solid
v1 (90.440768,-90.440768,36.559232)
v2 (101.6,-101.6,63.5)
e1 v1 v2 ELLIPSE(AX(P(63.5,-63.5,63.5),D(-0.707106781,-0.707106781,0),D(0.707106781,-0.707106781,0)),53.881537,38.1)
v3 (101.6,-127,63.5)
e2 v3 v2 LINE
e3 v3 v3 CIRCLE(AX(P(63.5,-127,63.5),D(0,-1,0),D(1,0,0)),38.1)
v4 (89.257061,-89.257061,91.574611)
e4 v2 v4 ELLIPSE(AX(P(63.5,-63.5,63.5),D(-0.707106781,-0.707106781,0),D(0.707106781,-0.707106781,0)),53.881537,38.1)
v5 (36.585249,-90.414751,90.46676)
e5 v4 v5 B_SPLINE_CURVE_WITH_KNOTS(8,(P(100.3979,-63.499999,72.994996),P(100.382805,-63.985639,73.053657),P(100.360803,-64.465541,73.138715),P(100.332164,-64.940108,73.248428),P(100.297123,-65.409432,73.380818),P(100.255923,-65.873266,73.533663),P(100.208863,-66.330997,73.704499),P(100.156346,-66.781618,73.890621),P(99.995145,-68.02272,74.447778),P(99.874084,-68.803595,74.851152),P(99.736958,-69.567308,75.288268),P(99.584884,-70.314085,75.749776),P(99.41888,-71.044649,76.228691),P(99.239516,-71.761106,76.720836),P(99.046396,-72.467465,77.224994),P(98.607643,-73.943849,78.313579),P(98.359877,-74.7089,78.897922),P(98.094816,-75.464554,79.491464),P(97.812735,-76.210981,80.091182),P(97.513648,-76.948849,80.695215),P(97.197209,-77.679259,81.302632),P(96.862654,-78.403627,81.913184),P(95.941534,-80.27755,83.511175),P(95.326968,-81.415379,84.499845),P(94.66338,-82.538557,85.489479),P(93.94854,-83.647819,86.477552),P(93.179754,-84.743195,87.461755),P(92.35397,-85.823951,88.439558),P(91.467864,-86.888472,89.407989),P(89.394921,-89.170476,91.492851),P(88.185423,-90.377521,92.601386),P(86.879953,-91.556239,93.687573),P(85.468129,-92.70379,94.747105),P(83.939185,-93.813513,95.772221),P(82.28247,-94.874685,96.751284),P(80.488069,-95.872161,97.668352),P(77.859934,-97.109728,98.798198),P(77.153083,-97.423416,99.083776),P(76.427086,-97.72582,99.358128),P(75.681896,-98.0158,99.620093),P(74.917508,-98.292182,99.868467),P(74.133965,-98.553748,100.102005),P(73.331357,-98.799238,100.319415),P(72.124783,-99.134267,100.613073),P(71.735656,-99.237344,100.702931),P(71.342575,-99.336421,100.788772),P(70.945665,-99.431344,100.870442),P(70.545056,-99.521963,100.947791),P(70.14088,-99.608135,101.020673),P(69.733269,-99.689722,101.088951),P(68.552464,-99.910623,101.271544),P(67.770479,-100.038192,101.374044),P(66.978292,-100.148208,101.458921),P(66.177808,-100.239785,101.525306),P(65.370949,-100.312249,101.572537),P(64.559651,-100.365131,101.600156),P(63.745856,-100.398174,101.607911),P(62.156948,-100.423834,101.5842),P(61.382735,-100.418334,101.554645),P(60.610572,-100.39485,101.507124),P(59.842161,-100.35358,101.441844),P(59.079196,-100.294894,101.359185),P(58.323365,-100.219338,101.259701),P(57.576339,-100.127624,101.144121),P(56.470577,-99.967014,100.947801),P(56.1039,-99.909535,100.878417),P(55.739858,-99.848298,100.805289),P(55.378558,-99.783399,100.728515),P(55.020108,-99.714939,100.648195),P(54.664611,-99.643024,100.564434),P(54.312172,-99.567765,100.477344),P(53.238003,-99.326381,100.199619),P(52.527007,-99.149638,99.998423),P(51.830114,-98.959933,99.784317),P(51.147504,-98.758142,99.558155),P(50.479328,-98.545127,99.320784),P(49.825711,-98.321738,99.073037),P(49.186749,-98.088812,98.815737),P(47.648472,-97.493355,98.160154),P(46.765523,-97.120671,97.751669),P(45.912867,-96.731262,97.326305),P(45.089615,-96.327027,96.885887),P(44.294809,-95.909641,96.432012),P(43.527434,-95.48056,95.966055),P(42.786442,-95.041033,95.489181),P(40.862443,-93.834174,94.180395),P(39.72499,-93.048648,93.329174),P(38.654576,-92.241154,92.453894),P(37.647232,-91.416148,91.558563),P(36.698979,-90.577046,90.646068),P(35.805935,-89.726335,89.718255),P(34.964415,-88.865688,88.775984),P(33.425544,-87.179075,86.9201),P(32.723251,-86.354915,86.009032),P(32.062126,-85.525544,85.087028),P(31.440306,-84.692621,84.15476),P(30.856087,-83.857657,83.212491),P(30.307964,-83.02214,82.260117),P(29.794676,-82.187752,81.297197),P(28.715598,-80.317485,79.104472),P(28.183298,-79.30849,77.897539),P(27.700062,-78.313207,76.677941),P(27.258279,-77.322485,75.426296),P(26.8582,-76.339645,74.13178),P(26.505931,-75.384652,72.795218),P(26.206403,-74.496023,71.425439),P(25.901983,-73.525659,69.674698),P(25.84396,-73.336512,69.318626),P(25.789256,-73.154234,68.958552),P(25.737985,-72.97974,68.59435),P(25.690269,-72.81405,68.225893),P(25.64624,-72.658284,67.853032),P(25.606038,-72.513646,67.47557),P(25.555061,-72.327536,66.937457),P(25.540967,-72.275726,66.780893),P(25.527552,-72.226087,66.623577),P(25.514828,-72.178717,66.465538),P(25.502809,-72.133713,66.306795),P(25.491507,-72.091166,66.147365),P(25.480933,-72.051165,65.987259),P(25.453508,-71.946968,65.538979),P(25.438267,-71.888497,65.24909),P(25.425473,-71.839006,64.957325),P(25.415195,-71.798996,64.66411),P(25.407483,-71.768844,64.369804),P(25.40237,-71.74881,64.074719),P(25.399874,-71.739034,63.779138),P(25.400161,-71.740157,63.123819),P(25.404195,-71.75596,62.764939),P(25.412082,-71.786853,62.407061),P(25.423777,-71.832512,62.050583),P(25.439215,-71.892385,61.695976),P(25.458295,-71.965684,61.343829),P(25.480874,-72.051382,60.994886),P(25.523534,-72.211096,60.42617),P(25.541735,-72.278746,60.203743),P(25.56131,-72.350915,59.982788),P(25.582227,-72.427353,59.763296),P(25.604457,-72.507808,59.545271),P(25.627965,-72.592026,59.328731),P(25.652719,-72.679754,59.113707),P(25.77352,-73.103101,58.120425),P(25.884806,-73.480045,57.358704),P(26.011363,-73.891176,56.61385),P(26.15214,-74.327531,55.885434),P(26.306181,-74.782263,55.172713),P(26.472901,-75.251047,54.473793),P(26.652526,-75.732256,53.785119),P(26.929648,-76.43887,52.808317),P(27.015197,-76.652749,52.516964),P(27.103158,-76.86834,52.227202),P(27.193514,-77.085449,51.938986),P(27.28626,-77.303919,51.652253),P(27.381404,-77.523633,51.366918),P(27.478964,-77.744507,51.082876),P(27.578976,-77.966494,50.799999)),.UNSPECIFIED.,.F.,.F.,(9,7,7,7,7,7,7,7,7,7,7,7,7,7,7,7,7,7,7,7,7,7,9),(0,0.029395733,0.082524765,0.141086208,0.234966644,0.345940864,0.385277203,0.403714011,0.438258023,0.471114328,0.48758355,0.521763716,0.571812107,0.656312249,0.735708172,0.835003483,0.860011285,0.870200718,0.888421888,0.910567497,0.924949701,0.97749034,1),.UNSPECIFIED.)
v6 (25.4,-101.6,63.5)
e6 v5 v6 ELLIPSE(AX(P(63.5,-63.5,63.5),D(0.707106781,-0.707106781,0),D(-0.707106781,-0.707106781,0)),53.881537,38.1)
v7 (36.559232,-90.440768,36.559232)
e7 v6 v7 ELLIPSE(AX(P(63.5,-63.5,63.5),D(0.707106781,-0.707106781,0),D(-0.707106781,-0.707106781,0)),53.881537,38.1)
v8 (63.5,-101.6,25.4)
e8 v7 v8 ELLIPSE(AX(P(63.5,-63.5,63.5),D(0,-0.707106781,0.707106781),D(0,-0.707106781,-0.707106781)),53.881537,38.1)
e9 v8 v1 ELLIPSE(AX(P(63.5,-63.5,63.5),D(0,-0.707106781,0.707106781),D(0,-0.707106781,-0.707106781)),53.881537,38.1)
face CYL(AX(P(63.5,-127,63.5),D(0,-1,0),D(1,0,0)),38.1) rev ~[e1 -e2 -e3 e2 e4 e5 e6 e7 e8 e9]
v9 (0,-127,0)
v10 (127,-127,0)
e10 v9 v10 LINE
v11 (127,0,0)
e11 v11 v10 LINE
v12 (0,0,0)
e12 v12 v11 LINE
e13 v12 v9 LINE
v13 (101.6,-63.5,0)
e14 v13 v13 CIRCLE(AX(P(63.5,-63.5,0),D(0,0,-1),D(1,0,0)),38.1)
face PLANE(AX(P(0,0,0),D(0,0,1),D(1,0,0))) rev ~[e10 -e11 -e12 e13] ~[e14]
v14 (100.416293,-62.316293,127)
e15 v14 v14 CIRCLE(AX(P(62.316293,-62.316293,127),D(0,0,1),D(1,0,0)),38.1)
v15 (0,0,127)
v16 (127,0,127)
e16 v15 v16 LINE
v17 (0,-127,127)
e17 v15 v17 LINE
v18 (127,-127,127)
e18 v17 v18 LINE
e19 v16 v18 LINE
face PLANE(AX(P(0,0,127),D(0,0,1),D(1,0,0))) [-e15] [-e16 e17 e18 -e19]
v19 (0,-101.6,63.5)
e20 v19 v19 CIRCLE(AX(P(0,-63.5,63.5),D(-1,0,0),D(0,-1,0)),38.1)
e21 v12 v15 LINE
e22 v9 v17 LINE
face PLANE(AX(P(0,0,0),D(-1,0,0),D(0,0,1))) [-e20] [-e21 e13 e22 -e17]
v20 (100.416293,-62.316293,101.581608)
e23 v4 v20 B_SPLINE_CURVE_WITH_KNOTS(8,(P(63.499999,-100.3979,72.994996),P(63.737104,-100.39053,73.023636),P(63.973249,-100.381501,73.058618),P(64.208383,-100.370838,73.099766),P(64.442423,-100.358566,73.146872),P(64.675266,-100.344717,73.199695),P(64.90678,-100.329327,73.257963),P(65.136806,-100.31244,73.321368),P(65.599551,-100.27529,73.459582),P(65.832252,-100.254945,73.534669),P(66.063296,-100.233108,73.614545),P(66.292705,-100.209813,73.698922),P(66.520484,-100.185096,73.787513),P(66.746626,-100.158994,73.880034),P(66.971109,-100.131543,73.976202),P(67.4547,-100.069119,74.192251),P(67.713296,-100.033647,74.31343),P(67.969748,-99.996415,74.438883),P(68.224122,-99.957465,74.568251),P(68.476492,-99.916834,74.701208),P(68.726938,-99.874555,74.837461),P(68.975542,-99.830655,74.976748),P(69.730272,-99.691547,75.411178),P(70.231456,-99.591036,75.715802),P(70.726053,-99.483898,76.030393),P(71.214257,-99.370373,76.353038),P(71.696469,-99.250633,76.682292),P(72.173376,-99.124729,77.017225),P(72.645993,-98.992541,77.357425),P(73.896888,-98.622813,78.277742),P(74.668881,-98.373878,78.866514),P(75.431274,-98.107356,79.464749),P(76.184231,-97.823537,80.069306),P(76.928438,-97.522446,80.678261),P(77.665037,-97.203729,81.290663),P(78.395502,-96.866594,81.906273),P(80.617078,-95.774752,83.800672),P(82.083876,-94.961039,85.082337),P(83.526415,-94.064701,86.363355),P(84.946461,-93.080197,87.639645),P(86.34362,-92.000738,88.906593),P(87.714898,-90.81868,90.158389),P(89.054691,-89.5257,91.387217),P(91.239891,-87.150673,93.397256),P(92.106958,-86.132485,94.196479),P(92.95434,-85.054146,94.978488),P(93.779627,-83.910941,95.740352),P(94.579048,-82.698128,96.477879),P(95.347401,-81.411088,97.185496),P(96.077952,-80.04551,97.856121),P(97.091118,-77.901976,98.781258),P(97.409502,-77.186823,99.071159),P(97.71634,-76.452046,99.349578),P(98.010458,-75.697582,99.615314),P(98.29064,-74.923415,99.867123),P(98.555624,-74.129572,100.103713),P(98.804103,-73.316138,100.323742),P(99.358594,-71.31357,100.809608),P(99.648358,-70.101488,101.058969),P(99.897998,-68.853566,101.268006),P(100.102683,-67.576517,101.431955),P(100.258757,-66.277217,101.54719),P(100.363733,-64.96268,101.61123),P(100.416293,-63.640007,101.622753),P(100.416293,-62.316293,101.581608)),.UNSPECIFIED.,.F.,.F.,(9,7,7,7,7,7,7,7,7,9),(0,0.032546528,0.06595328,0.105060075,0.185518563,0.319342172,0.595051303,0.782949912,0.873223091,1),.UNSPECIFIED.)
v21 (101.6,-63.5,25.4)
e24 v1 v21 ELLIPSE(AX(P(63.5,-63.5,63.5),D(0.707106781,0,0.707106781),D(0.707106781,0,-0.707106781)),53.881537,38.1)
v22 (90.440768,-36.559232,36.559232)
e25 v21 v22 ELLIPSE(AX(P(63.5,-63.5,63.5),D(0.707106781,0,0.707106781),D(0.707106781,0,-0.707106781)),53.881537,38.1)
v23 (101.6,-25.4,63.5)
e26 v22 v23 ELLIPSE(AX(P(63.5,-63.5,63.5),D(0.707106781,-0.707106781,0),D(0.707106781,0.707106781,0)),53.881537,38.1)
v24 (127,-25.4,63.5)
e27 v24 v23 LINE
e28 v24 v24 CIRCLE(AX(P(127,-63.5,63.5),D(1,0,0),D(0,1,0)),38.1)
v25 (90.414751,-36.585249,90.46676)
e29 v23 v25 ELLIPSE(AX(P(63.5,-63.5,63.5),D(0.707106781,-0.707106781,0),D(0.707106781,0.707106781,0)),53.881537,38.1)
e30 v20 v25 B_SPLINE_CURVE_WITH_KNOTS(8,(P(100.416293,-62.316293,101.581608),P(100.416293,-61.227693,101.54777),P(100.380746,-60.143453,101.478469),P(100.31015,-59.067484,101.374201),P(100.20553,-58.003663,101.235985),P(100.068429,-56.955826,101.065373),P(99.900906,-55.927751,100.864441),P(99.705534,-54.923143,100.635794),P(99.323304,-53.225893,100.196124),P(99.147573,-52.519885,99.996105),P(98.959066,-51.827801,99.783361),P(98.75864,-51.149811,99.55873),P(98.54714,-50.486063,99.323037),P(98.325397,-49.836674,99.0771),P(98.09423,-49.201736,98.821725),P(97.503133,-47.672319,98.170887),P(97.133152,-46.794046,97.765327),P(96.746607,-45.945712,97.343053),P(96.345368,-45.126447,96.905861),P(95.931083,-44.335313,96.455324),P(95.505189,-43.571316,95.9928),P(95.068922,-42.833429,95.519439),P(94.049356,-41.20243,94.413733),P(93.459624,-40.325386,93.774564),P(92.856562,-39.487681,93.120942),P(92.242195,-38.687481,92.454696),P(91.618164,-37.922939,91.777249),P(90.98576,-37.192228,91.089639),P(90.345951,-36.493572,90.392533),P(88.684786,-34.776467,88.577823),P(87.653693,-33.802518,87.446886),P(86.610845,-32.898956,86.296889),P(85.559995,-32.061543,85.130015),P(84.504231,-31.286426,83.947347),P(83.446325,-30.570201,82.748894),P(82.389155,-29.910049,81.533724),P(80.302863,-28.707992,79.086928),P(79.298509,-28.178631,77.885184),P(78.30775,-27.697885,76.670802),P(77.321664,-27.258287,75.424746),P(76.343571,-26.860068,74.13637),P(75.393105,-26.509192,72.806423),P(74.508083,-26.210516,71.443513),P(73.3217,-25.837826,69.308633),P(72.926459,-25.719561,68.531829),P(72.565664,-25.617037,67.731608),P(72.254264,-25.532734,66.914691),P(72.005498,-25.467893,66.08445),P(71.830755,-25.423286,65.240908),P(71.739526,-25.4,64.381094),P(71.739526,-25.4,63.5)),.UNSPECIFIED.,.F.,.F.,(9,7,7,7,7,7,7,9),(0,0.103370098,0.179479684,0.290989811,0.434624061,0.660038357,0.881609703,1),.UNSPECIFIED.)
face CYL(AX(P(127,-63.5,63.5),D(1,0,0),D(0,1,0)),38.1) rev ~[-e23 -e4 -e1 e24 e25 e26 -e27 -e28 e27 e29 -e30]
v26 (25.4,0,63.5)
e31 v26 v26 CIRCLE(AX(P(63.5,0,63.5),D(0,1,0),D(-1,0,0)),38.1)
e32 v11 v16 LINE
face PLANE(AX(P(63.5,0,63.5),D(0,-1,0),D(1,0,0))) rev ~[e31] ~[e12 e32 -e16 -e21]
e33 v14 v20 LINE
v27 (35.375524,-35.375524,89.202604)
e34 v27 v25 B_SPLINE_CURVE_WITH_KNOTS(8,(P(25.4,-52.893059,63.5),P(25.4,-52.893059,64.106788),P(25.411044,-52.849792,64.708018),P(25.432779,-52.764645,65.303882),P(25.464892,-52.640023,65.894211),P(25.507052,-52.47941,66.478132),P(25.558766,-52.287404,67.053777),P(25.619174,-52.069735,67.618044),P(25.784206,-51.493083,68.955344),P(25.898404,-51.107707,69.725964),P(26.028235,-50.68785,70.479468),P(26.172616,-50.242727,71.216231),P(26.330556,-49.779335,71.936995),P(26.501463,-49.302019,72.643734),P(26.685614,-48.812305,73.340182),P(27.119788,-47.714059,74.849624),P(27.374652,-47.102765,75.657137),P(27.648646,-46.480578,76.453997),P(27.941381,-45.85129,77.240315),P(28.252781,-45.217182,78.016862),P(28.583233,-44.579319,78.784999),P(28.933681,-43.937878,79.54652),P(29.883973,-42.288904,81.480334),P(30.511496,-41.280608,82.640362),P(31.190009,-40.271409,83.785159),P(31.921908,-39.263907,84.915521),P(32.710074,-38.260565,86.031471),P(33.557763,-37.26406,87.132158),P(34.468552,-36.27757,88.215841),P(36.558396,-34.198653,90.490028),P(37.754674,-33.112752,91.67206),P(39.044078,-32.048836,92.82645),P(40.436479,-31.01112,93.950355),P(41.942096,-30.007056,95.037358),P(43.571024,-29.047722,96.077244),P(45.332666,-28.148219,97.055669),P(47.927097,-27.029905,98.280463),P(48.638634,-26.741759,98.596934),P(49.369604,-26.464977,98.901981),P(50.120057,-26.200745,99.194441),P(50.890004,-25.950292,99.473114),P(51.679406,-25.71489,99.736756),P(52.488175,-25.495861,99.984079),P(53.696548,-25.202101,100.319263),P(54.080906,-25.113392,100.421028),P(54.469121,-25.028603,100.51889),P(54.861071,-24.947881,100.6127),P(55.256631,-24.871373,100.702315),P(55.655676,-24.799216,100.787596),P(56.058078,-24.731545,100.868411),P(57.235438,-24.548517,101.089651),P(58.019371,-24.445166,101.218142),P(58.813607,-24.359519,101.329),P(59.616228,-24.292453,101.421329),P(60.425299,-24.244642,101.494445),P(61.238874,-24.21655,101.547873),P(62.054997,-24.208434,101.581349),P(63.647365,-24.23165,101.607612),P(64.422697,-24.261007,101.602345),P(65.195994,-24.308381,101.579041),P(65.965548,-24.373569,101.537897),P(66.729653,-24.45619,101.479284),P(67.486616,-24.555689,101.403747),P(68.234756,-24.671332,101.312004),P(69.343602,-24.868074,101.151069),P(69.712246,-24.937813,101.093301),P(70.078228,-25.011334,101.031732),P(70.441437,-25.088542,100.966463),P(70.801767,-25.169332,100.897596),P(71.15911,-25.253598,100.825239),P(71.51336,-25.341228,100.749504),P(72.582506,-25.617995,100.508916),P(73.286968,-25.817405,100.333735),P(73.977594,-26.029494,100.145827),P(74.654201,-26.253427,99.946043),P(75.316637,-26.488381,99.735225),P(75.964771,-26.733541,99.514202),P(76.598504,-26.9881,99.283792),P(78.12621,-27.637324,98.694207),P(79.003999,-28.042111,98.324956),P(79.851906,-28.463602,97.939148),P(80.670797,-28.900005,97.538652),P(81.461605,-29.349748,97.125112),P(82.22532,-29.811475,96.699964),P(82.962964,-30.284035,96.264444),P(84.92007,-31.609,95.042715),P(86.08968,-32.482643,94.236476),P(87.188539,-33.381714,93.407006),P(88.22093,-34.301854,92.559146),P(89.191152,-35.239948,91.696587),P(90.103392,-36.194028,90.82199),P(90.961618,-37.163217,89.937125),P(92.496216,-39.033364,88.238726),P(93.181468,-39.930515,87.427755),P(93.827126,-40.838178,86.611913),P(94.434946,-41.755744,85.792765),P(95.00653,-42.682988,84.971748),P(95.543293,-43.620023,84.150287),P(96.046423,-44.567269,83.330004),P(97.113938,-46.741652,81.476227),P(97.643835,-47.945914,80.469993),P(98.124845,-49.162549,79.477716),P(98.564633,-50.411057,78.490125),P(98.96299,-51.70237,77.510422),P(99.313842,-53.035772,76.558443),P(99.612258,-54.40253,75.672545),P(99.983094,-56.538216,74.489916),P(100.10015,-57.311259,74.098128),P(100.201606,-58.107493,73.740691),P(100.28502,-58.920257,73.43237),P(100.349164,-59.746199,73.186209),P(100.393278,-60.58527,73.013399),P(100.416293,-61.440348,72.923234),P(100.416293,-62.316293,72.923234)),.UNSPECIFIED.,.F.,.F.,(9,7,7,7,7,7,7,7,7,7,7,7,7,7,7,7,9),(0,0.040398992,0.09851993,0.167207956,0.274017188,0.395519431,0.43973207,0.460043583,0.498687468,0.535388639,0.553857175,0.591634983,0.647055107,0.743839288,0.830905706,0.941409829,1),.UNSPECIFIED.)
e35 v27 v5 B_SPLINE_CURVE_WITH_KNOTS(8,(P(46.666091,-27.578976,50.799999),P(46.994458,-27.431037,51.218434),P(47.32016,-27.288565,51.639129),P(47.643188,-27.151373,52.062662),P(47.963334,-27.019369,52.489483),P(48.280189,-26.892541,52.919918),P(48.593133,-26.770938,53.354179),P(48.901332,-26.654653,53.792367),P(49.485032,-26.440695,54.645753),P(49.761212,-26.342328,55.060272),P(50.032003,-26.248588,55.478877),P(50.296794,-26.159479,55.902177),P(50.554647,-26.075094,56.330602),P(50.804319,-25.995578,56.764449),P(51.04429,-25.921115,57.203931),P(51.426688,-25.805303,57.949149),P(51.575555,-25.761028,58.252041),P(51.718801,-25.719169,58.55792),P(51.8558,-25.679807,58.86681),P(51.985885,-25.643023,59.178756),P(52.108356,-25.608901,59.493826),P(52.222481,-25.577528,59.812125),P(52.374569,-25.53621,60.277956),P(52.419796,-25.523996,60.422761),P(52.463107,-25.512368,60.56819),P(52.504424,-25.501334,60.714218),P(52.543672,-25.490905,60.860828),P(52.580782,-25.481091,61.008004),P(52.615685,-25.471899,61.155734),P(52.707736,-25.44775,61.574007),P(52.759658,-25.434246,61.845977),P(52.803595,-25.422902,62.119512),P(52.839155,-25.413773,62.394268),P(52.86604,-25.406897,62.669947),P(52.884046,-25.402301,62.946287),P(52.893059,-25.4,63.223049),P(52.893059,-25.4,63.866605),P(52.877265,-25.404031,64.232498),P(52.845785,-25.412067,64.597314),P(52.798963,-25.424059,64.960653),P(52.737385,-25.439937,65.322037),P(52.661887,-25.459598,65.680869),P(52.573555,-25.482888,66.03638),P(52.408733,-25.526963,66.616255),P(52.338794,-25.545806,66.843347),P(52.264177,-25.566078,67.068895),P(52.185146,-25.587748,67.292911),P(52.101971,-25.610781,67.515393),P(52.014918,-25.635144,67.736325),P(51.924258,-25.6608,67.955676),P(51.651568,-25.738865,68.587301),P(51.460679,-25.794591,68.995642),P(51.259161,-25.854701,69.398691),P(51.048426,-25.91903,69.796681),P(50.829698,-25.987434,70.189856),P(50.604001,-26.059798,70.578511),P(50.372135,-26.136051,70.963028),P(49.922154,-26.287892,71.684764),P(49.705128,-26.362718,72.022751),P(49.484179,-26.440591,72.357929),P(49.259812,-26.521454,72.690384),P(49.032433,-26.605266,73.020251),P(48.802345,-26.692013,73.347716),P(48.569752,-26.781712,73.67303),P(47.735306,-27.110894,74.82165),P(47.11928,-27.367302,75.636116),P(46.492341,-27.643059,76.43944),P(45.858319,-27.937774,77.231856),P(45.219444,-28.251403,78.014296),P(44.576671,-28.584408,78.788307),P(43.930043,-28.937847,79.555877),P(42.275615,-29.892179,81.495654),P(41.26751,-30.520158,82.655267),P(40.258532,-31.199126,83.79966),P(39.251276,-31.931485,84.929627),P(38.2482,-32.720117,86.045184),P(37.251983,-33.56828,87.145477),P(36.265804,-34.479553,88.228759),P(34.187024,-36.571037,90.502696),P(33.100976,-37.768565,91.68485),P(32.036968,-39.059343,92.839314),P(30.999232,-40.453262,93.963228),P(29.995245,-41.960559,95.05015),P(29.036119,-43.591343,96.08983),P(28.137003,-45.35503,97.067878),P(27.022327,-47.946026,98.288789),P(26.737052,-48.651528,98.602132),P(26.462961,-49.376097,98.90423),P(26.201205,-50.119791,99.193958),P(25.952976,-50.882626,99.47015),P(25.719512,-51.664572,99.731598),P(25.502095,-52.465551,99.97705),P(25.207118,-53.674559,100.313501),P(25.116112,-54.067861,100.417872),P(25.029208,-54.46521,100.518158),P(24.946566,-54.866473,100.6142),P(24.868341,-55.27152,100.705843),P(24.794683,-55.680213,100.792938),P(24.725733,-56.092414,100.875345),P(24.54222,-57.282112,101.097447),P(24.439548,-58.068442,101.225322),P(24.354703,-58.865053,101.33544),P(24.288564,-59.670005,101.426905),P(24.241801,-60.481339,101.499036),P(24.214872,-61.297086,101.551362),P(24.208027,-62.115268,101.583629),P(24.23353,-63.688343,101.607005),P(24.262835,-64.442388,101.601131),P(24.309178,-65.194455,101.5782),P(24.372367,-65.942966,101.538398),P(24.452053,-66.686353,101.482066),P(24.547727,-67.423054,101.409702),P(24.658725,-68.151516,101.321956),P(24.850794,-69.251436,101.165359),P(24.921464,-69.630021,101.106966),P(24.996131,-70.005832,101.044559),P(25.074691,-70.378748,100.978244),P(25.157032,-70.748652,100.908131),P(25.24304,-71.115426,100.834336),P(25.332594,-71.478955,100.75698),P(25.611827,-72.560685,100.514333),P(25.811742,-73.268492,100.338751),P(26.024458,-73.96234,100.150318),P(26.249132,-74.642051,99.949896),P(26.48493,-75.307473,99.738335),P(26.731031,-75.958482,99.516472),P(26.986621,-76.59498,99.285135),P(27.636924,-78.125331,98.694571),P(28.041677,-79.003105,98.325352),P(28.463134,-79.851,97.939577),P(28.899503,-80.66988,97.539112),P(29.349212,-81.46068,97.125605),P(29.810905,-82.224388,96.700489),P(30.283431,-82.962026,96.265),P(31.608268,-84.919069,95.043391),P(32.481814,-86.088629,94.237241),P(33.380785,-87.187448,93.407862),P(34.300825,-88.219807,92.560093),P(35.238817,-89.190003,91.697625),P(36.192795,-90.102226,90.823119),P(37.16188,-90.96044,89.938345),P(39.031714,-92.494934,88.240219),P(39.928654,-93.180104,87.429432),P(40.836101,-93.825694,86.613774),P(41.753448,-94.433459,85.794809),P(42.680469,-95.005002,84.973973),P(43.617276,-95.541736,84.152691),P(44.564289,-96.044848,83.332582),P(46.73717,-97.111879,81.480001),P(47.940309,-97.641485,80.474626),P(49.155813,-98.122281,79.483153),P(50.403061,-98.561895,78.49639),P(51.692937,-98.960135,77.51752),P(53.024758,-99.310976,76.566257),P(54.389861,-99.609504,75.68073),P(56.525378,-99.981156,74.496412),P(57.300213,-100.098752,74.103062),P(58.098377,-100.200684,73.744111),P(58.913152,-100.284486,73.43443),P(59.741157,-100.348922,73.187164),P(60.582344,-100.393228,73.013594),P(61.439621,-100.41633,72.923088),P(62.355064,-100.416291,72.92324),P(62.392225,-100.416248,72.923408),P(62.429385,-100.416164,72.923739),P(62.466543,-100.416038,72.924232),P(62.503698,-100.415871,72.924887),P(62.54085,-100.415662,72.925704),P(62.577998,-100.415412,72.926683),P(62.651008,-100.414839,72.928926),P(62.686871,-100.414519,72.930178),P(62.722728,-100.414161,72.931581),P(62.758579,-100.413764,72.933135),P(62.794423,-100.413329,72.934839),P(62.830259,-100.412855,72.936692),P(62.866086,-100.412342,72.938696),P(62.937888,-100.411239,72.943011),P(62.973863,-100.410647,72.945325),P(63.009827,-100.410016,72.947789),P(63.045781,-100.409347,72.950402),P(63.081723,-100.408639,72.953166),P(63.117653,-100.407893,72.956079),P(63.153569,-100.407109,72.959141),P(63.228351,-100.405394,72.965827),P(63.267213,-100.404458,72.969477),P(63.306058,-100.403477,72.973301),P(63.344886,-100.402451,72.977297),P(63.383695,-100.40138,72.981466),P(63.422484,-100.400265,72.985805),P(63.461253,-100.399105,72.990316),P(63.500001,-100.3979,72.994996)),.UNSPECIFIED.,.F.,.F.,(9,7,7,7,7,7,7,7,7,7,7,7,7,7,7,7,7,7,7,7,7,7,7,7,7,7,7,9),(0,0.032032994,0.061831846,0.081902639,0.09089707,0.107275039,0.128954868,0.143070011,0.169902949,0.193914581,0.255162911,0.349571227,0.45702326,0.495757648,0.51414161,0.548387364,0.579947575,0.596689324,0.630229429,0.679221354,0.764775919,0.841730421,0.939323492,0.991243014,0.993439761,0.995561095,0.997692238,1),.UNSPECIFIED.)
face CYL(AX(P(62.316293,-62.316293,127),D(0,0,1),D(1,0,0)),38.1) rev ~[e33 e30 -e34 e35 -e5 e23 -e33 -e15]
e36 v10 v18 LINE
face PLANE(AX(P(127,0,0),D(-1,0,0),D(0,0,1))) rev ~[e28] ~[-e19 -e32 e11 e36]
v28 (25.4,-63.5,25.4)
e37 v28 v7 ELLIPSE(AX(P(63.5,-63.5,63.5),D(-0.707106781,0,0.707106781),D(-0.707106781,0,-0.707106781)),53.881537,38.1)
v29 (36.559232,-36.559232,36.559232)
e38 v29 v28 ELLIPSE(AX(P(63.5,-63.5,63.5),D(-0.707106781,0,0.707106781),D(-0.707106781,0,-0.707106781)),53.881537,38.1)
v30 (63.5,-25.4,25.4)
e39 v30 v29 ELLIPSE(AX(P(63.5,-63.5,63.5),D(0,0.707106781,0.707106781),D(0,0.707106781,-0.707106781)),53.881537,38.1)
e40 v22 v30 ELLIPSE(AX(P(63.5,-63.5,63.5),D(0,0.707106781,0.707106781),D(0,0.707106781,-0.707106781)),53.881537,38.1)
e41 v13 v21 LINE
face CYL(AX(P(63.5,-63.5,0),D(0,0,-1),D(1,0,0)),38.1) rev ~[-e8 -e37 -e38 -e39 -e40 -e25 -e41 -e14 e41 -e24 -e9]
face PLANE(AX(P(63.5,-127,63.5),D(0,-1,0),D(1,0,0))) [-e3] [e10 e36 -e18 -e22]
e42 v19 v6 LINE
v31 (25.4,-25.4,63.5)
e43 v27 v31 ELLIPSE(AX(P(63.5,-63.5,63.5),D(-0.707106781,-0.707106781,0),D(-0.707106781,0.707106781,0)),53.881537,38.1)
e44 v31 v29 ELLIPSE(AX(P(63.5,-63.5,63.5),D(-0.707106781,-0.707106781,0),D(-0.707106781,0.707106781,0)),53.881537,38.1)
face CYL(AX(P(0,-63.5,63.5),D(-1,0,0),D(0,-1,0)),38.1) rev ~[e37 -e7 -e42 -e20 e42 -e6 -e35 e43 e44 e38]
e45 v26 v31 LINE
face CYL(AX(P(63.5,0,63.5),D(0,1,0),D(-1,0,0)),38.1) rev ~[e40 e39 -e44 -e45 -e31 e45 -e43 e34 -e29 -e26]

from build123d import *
from build123d import SkipClean  # not in build123d's __all__

# Parameters (mm, degrees)
F0_W      = 127
F0_H      = 127
F1_DEPTH  = 127
F2_R      = 38.1
F3_DEPTH  = 76.2
F4_R      = 38.1
F6_DEPTH  = 76.2
F7_R      = 38.1
F9_DEPTH  = 76.2
F10_R     = 38.1
F11_DEPTH = 76.2
F12_R     = 38.1
F13_DEPTH = 76.2
F14_R     = 38.1
F15_DEPTH = 76.2


with BuildPart() as f1:
    # F0 (on Front) → F1 (new body)
    with BuildSketch(Plane.XZ):
        with Locations((63.5, 63.5)):
            Rectangle(F0_W, F0_H)
    extrude(amount=F1_DEPTH)

    # F2 (on face) → F3 (cut)
    with BuildSketch(Plane.XZ.offset(127)):
        with Locations((63.5, 63.5)):
            Circle(F2_R)
    extrude(amount=-F3_DEPTH, mode=Mode.SUBTRACT)

    # F4 (on face) → F6 (cut)
    with BuildSketch(Plane(origin=(0, 0, 0), x_dir=(0, -1, 0), z_dir=(-1, 0, 0))):
        with Locations((63.5, 63.5)):
            Circle(F4_R)
    extrude(amount=-F6_DEPTH, mode=Mode.SUBTRACT)

    # F7 (on face) → F9 (cut)
    with BuildSketch(Plane.YZ.offset(127)):
        with Locations((-63.5, 63.5)):
            Circle(F7_R)
    with SkipClean():  # cleaning this boolean's faces spoils the solid; the shape is the same uncleaned
        extrude(amount=-F9_DEPTH, mode=Mode.SUBTRACT)

    # F10 (on face) → F11 (cut)
    with BuildSketch(Plane(origin=(0, 0, 0), x_dir=(-1, 0, 0), z_dir=(0, 1, 0))):
        with Locations((-63.5, 63.5)):
            Circle(F10_R)
    extrude(amount=-F11_DEPTH, mode=Mode.SUBTRACT)

    # F12 (on face) → F13 (cut)
    with BuildSketch(Plane.XY.offset(127)):
        with Locations((62.3162926857, -62.3162926857)):
            Circle(F12_R)
    extrude(amount=-F13_DEPTH, mode=Mode.SUBTRACT)

    # F14 (on face) → F15 (cut)
    with BuildSketch(Plane(origin=(0, 0, 0), x_dir=(1, 0, 0), z_dir=(0, 0, -1))):
        with Locations((63.5, 63.5)):
            Circle(F14_R)
    extrude(amount=-F15_DEPTH, mode=Mode.SUBTRACT)


solid = f1.part
